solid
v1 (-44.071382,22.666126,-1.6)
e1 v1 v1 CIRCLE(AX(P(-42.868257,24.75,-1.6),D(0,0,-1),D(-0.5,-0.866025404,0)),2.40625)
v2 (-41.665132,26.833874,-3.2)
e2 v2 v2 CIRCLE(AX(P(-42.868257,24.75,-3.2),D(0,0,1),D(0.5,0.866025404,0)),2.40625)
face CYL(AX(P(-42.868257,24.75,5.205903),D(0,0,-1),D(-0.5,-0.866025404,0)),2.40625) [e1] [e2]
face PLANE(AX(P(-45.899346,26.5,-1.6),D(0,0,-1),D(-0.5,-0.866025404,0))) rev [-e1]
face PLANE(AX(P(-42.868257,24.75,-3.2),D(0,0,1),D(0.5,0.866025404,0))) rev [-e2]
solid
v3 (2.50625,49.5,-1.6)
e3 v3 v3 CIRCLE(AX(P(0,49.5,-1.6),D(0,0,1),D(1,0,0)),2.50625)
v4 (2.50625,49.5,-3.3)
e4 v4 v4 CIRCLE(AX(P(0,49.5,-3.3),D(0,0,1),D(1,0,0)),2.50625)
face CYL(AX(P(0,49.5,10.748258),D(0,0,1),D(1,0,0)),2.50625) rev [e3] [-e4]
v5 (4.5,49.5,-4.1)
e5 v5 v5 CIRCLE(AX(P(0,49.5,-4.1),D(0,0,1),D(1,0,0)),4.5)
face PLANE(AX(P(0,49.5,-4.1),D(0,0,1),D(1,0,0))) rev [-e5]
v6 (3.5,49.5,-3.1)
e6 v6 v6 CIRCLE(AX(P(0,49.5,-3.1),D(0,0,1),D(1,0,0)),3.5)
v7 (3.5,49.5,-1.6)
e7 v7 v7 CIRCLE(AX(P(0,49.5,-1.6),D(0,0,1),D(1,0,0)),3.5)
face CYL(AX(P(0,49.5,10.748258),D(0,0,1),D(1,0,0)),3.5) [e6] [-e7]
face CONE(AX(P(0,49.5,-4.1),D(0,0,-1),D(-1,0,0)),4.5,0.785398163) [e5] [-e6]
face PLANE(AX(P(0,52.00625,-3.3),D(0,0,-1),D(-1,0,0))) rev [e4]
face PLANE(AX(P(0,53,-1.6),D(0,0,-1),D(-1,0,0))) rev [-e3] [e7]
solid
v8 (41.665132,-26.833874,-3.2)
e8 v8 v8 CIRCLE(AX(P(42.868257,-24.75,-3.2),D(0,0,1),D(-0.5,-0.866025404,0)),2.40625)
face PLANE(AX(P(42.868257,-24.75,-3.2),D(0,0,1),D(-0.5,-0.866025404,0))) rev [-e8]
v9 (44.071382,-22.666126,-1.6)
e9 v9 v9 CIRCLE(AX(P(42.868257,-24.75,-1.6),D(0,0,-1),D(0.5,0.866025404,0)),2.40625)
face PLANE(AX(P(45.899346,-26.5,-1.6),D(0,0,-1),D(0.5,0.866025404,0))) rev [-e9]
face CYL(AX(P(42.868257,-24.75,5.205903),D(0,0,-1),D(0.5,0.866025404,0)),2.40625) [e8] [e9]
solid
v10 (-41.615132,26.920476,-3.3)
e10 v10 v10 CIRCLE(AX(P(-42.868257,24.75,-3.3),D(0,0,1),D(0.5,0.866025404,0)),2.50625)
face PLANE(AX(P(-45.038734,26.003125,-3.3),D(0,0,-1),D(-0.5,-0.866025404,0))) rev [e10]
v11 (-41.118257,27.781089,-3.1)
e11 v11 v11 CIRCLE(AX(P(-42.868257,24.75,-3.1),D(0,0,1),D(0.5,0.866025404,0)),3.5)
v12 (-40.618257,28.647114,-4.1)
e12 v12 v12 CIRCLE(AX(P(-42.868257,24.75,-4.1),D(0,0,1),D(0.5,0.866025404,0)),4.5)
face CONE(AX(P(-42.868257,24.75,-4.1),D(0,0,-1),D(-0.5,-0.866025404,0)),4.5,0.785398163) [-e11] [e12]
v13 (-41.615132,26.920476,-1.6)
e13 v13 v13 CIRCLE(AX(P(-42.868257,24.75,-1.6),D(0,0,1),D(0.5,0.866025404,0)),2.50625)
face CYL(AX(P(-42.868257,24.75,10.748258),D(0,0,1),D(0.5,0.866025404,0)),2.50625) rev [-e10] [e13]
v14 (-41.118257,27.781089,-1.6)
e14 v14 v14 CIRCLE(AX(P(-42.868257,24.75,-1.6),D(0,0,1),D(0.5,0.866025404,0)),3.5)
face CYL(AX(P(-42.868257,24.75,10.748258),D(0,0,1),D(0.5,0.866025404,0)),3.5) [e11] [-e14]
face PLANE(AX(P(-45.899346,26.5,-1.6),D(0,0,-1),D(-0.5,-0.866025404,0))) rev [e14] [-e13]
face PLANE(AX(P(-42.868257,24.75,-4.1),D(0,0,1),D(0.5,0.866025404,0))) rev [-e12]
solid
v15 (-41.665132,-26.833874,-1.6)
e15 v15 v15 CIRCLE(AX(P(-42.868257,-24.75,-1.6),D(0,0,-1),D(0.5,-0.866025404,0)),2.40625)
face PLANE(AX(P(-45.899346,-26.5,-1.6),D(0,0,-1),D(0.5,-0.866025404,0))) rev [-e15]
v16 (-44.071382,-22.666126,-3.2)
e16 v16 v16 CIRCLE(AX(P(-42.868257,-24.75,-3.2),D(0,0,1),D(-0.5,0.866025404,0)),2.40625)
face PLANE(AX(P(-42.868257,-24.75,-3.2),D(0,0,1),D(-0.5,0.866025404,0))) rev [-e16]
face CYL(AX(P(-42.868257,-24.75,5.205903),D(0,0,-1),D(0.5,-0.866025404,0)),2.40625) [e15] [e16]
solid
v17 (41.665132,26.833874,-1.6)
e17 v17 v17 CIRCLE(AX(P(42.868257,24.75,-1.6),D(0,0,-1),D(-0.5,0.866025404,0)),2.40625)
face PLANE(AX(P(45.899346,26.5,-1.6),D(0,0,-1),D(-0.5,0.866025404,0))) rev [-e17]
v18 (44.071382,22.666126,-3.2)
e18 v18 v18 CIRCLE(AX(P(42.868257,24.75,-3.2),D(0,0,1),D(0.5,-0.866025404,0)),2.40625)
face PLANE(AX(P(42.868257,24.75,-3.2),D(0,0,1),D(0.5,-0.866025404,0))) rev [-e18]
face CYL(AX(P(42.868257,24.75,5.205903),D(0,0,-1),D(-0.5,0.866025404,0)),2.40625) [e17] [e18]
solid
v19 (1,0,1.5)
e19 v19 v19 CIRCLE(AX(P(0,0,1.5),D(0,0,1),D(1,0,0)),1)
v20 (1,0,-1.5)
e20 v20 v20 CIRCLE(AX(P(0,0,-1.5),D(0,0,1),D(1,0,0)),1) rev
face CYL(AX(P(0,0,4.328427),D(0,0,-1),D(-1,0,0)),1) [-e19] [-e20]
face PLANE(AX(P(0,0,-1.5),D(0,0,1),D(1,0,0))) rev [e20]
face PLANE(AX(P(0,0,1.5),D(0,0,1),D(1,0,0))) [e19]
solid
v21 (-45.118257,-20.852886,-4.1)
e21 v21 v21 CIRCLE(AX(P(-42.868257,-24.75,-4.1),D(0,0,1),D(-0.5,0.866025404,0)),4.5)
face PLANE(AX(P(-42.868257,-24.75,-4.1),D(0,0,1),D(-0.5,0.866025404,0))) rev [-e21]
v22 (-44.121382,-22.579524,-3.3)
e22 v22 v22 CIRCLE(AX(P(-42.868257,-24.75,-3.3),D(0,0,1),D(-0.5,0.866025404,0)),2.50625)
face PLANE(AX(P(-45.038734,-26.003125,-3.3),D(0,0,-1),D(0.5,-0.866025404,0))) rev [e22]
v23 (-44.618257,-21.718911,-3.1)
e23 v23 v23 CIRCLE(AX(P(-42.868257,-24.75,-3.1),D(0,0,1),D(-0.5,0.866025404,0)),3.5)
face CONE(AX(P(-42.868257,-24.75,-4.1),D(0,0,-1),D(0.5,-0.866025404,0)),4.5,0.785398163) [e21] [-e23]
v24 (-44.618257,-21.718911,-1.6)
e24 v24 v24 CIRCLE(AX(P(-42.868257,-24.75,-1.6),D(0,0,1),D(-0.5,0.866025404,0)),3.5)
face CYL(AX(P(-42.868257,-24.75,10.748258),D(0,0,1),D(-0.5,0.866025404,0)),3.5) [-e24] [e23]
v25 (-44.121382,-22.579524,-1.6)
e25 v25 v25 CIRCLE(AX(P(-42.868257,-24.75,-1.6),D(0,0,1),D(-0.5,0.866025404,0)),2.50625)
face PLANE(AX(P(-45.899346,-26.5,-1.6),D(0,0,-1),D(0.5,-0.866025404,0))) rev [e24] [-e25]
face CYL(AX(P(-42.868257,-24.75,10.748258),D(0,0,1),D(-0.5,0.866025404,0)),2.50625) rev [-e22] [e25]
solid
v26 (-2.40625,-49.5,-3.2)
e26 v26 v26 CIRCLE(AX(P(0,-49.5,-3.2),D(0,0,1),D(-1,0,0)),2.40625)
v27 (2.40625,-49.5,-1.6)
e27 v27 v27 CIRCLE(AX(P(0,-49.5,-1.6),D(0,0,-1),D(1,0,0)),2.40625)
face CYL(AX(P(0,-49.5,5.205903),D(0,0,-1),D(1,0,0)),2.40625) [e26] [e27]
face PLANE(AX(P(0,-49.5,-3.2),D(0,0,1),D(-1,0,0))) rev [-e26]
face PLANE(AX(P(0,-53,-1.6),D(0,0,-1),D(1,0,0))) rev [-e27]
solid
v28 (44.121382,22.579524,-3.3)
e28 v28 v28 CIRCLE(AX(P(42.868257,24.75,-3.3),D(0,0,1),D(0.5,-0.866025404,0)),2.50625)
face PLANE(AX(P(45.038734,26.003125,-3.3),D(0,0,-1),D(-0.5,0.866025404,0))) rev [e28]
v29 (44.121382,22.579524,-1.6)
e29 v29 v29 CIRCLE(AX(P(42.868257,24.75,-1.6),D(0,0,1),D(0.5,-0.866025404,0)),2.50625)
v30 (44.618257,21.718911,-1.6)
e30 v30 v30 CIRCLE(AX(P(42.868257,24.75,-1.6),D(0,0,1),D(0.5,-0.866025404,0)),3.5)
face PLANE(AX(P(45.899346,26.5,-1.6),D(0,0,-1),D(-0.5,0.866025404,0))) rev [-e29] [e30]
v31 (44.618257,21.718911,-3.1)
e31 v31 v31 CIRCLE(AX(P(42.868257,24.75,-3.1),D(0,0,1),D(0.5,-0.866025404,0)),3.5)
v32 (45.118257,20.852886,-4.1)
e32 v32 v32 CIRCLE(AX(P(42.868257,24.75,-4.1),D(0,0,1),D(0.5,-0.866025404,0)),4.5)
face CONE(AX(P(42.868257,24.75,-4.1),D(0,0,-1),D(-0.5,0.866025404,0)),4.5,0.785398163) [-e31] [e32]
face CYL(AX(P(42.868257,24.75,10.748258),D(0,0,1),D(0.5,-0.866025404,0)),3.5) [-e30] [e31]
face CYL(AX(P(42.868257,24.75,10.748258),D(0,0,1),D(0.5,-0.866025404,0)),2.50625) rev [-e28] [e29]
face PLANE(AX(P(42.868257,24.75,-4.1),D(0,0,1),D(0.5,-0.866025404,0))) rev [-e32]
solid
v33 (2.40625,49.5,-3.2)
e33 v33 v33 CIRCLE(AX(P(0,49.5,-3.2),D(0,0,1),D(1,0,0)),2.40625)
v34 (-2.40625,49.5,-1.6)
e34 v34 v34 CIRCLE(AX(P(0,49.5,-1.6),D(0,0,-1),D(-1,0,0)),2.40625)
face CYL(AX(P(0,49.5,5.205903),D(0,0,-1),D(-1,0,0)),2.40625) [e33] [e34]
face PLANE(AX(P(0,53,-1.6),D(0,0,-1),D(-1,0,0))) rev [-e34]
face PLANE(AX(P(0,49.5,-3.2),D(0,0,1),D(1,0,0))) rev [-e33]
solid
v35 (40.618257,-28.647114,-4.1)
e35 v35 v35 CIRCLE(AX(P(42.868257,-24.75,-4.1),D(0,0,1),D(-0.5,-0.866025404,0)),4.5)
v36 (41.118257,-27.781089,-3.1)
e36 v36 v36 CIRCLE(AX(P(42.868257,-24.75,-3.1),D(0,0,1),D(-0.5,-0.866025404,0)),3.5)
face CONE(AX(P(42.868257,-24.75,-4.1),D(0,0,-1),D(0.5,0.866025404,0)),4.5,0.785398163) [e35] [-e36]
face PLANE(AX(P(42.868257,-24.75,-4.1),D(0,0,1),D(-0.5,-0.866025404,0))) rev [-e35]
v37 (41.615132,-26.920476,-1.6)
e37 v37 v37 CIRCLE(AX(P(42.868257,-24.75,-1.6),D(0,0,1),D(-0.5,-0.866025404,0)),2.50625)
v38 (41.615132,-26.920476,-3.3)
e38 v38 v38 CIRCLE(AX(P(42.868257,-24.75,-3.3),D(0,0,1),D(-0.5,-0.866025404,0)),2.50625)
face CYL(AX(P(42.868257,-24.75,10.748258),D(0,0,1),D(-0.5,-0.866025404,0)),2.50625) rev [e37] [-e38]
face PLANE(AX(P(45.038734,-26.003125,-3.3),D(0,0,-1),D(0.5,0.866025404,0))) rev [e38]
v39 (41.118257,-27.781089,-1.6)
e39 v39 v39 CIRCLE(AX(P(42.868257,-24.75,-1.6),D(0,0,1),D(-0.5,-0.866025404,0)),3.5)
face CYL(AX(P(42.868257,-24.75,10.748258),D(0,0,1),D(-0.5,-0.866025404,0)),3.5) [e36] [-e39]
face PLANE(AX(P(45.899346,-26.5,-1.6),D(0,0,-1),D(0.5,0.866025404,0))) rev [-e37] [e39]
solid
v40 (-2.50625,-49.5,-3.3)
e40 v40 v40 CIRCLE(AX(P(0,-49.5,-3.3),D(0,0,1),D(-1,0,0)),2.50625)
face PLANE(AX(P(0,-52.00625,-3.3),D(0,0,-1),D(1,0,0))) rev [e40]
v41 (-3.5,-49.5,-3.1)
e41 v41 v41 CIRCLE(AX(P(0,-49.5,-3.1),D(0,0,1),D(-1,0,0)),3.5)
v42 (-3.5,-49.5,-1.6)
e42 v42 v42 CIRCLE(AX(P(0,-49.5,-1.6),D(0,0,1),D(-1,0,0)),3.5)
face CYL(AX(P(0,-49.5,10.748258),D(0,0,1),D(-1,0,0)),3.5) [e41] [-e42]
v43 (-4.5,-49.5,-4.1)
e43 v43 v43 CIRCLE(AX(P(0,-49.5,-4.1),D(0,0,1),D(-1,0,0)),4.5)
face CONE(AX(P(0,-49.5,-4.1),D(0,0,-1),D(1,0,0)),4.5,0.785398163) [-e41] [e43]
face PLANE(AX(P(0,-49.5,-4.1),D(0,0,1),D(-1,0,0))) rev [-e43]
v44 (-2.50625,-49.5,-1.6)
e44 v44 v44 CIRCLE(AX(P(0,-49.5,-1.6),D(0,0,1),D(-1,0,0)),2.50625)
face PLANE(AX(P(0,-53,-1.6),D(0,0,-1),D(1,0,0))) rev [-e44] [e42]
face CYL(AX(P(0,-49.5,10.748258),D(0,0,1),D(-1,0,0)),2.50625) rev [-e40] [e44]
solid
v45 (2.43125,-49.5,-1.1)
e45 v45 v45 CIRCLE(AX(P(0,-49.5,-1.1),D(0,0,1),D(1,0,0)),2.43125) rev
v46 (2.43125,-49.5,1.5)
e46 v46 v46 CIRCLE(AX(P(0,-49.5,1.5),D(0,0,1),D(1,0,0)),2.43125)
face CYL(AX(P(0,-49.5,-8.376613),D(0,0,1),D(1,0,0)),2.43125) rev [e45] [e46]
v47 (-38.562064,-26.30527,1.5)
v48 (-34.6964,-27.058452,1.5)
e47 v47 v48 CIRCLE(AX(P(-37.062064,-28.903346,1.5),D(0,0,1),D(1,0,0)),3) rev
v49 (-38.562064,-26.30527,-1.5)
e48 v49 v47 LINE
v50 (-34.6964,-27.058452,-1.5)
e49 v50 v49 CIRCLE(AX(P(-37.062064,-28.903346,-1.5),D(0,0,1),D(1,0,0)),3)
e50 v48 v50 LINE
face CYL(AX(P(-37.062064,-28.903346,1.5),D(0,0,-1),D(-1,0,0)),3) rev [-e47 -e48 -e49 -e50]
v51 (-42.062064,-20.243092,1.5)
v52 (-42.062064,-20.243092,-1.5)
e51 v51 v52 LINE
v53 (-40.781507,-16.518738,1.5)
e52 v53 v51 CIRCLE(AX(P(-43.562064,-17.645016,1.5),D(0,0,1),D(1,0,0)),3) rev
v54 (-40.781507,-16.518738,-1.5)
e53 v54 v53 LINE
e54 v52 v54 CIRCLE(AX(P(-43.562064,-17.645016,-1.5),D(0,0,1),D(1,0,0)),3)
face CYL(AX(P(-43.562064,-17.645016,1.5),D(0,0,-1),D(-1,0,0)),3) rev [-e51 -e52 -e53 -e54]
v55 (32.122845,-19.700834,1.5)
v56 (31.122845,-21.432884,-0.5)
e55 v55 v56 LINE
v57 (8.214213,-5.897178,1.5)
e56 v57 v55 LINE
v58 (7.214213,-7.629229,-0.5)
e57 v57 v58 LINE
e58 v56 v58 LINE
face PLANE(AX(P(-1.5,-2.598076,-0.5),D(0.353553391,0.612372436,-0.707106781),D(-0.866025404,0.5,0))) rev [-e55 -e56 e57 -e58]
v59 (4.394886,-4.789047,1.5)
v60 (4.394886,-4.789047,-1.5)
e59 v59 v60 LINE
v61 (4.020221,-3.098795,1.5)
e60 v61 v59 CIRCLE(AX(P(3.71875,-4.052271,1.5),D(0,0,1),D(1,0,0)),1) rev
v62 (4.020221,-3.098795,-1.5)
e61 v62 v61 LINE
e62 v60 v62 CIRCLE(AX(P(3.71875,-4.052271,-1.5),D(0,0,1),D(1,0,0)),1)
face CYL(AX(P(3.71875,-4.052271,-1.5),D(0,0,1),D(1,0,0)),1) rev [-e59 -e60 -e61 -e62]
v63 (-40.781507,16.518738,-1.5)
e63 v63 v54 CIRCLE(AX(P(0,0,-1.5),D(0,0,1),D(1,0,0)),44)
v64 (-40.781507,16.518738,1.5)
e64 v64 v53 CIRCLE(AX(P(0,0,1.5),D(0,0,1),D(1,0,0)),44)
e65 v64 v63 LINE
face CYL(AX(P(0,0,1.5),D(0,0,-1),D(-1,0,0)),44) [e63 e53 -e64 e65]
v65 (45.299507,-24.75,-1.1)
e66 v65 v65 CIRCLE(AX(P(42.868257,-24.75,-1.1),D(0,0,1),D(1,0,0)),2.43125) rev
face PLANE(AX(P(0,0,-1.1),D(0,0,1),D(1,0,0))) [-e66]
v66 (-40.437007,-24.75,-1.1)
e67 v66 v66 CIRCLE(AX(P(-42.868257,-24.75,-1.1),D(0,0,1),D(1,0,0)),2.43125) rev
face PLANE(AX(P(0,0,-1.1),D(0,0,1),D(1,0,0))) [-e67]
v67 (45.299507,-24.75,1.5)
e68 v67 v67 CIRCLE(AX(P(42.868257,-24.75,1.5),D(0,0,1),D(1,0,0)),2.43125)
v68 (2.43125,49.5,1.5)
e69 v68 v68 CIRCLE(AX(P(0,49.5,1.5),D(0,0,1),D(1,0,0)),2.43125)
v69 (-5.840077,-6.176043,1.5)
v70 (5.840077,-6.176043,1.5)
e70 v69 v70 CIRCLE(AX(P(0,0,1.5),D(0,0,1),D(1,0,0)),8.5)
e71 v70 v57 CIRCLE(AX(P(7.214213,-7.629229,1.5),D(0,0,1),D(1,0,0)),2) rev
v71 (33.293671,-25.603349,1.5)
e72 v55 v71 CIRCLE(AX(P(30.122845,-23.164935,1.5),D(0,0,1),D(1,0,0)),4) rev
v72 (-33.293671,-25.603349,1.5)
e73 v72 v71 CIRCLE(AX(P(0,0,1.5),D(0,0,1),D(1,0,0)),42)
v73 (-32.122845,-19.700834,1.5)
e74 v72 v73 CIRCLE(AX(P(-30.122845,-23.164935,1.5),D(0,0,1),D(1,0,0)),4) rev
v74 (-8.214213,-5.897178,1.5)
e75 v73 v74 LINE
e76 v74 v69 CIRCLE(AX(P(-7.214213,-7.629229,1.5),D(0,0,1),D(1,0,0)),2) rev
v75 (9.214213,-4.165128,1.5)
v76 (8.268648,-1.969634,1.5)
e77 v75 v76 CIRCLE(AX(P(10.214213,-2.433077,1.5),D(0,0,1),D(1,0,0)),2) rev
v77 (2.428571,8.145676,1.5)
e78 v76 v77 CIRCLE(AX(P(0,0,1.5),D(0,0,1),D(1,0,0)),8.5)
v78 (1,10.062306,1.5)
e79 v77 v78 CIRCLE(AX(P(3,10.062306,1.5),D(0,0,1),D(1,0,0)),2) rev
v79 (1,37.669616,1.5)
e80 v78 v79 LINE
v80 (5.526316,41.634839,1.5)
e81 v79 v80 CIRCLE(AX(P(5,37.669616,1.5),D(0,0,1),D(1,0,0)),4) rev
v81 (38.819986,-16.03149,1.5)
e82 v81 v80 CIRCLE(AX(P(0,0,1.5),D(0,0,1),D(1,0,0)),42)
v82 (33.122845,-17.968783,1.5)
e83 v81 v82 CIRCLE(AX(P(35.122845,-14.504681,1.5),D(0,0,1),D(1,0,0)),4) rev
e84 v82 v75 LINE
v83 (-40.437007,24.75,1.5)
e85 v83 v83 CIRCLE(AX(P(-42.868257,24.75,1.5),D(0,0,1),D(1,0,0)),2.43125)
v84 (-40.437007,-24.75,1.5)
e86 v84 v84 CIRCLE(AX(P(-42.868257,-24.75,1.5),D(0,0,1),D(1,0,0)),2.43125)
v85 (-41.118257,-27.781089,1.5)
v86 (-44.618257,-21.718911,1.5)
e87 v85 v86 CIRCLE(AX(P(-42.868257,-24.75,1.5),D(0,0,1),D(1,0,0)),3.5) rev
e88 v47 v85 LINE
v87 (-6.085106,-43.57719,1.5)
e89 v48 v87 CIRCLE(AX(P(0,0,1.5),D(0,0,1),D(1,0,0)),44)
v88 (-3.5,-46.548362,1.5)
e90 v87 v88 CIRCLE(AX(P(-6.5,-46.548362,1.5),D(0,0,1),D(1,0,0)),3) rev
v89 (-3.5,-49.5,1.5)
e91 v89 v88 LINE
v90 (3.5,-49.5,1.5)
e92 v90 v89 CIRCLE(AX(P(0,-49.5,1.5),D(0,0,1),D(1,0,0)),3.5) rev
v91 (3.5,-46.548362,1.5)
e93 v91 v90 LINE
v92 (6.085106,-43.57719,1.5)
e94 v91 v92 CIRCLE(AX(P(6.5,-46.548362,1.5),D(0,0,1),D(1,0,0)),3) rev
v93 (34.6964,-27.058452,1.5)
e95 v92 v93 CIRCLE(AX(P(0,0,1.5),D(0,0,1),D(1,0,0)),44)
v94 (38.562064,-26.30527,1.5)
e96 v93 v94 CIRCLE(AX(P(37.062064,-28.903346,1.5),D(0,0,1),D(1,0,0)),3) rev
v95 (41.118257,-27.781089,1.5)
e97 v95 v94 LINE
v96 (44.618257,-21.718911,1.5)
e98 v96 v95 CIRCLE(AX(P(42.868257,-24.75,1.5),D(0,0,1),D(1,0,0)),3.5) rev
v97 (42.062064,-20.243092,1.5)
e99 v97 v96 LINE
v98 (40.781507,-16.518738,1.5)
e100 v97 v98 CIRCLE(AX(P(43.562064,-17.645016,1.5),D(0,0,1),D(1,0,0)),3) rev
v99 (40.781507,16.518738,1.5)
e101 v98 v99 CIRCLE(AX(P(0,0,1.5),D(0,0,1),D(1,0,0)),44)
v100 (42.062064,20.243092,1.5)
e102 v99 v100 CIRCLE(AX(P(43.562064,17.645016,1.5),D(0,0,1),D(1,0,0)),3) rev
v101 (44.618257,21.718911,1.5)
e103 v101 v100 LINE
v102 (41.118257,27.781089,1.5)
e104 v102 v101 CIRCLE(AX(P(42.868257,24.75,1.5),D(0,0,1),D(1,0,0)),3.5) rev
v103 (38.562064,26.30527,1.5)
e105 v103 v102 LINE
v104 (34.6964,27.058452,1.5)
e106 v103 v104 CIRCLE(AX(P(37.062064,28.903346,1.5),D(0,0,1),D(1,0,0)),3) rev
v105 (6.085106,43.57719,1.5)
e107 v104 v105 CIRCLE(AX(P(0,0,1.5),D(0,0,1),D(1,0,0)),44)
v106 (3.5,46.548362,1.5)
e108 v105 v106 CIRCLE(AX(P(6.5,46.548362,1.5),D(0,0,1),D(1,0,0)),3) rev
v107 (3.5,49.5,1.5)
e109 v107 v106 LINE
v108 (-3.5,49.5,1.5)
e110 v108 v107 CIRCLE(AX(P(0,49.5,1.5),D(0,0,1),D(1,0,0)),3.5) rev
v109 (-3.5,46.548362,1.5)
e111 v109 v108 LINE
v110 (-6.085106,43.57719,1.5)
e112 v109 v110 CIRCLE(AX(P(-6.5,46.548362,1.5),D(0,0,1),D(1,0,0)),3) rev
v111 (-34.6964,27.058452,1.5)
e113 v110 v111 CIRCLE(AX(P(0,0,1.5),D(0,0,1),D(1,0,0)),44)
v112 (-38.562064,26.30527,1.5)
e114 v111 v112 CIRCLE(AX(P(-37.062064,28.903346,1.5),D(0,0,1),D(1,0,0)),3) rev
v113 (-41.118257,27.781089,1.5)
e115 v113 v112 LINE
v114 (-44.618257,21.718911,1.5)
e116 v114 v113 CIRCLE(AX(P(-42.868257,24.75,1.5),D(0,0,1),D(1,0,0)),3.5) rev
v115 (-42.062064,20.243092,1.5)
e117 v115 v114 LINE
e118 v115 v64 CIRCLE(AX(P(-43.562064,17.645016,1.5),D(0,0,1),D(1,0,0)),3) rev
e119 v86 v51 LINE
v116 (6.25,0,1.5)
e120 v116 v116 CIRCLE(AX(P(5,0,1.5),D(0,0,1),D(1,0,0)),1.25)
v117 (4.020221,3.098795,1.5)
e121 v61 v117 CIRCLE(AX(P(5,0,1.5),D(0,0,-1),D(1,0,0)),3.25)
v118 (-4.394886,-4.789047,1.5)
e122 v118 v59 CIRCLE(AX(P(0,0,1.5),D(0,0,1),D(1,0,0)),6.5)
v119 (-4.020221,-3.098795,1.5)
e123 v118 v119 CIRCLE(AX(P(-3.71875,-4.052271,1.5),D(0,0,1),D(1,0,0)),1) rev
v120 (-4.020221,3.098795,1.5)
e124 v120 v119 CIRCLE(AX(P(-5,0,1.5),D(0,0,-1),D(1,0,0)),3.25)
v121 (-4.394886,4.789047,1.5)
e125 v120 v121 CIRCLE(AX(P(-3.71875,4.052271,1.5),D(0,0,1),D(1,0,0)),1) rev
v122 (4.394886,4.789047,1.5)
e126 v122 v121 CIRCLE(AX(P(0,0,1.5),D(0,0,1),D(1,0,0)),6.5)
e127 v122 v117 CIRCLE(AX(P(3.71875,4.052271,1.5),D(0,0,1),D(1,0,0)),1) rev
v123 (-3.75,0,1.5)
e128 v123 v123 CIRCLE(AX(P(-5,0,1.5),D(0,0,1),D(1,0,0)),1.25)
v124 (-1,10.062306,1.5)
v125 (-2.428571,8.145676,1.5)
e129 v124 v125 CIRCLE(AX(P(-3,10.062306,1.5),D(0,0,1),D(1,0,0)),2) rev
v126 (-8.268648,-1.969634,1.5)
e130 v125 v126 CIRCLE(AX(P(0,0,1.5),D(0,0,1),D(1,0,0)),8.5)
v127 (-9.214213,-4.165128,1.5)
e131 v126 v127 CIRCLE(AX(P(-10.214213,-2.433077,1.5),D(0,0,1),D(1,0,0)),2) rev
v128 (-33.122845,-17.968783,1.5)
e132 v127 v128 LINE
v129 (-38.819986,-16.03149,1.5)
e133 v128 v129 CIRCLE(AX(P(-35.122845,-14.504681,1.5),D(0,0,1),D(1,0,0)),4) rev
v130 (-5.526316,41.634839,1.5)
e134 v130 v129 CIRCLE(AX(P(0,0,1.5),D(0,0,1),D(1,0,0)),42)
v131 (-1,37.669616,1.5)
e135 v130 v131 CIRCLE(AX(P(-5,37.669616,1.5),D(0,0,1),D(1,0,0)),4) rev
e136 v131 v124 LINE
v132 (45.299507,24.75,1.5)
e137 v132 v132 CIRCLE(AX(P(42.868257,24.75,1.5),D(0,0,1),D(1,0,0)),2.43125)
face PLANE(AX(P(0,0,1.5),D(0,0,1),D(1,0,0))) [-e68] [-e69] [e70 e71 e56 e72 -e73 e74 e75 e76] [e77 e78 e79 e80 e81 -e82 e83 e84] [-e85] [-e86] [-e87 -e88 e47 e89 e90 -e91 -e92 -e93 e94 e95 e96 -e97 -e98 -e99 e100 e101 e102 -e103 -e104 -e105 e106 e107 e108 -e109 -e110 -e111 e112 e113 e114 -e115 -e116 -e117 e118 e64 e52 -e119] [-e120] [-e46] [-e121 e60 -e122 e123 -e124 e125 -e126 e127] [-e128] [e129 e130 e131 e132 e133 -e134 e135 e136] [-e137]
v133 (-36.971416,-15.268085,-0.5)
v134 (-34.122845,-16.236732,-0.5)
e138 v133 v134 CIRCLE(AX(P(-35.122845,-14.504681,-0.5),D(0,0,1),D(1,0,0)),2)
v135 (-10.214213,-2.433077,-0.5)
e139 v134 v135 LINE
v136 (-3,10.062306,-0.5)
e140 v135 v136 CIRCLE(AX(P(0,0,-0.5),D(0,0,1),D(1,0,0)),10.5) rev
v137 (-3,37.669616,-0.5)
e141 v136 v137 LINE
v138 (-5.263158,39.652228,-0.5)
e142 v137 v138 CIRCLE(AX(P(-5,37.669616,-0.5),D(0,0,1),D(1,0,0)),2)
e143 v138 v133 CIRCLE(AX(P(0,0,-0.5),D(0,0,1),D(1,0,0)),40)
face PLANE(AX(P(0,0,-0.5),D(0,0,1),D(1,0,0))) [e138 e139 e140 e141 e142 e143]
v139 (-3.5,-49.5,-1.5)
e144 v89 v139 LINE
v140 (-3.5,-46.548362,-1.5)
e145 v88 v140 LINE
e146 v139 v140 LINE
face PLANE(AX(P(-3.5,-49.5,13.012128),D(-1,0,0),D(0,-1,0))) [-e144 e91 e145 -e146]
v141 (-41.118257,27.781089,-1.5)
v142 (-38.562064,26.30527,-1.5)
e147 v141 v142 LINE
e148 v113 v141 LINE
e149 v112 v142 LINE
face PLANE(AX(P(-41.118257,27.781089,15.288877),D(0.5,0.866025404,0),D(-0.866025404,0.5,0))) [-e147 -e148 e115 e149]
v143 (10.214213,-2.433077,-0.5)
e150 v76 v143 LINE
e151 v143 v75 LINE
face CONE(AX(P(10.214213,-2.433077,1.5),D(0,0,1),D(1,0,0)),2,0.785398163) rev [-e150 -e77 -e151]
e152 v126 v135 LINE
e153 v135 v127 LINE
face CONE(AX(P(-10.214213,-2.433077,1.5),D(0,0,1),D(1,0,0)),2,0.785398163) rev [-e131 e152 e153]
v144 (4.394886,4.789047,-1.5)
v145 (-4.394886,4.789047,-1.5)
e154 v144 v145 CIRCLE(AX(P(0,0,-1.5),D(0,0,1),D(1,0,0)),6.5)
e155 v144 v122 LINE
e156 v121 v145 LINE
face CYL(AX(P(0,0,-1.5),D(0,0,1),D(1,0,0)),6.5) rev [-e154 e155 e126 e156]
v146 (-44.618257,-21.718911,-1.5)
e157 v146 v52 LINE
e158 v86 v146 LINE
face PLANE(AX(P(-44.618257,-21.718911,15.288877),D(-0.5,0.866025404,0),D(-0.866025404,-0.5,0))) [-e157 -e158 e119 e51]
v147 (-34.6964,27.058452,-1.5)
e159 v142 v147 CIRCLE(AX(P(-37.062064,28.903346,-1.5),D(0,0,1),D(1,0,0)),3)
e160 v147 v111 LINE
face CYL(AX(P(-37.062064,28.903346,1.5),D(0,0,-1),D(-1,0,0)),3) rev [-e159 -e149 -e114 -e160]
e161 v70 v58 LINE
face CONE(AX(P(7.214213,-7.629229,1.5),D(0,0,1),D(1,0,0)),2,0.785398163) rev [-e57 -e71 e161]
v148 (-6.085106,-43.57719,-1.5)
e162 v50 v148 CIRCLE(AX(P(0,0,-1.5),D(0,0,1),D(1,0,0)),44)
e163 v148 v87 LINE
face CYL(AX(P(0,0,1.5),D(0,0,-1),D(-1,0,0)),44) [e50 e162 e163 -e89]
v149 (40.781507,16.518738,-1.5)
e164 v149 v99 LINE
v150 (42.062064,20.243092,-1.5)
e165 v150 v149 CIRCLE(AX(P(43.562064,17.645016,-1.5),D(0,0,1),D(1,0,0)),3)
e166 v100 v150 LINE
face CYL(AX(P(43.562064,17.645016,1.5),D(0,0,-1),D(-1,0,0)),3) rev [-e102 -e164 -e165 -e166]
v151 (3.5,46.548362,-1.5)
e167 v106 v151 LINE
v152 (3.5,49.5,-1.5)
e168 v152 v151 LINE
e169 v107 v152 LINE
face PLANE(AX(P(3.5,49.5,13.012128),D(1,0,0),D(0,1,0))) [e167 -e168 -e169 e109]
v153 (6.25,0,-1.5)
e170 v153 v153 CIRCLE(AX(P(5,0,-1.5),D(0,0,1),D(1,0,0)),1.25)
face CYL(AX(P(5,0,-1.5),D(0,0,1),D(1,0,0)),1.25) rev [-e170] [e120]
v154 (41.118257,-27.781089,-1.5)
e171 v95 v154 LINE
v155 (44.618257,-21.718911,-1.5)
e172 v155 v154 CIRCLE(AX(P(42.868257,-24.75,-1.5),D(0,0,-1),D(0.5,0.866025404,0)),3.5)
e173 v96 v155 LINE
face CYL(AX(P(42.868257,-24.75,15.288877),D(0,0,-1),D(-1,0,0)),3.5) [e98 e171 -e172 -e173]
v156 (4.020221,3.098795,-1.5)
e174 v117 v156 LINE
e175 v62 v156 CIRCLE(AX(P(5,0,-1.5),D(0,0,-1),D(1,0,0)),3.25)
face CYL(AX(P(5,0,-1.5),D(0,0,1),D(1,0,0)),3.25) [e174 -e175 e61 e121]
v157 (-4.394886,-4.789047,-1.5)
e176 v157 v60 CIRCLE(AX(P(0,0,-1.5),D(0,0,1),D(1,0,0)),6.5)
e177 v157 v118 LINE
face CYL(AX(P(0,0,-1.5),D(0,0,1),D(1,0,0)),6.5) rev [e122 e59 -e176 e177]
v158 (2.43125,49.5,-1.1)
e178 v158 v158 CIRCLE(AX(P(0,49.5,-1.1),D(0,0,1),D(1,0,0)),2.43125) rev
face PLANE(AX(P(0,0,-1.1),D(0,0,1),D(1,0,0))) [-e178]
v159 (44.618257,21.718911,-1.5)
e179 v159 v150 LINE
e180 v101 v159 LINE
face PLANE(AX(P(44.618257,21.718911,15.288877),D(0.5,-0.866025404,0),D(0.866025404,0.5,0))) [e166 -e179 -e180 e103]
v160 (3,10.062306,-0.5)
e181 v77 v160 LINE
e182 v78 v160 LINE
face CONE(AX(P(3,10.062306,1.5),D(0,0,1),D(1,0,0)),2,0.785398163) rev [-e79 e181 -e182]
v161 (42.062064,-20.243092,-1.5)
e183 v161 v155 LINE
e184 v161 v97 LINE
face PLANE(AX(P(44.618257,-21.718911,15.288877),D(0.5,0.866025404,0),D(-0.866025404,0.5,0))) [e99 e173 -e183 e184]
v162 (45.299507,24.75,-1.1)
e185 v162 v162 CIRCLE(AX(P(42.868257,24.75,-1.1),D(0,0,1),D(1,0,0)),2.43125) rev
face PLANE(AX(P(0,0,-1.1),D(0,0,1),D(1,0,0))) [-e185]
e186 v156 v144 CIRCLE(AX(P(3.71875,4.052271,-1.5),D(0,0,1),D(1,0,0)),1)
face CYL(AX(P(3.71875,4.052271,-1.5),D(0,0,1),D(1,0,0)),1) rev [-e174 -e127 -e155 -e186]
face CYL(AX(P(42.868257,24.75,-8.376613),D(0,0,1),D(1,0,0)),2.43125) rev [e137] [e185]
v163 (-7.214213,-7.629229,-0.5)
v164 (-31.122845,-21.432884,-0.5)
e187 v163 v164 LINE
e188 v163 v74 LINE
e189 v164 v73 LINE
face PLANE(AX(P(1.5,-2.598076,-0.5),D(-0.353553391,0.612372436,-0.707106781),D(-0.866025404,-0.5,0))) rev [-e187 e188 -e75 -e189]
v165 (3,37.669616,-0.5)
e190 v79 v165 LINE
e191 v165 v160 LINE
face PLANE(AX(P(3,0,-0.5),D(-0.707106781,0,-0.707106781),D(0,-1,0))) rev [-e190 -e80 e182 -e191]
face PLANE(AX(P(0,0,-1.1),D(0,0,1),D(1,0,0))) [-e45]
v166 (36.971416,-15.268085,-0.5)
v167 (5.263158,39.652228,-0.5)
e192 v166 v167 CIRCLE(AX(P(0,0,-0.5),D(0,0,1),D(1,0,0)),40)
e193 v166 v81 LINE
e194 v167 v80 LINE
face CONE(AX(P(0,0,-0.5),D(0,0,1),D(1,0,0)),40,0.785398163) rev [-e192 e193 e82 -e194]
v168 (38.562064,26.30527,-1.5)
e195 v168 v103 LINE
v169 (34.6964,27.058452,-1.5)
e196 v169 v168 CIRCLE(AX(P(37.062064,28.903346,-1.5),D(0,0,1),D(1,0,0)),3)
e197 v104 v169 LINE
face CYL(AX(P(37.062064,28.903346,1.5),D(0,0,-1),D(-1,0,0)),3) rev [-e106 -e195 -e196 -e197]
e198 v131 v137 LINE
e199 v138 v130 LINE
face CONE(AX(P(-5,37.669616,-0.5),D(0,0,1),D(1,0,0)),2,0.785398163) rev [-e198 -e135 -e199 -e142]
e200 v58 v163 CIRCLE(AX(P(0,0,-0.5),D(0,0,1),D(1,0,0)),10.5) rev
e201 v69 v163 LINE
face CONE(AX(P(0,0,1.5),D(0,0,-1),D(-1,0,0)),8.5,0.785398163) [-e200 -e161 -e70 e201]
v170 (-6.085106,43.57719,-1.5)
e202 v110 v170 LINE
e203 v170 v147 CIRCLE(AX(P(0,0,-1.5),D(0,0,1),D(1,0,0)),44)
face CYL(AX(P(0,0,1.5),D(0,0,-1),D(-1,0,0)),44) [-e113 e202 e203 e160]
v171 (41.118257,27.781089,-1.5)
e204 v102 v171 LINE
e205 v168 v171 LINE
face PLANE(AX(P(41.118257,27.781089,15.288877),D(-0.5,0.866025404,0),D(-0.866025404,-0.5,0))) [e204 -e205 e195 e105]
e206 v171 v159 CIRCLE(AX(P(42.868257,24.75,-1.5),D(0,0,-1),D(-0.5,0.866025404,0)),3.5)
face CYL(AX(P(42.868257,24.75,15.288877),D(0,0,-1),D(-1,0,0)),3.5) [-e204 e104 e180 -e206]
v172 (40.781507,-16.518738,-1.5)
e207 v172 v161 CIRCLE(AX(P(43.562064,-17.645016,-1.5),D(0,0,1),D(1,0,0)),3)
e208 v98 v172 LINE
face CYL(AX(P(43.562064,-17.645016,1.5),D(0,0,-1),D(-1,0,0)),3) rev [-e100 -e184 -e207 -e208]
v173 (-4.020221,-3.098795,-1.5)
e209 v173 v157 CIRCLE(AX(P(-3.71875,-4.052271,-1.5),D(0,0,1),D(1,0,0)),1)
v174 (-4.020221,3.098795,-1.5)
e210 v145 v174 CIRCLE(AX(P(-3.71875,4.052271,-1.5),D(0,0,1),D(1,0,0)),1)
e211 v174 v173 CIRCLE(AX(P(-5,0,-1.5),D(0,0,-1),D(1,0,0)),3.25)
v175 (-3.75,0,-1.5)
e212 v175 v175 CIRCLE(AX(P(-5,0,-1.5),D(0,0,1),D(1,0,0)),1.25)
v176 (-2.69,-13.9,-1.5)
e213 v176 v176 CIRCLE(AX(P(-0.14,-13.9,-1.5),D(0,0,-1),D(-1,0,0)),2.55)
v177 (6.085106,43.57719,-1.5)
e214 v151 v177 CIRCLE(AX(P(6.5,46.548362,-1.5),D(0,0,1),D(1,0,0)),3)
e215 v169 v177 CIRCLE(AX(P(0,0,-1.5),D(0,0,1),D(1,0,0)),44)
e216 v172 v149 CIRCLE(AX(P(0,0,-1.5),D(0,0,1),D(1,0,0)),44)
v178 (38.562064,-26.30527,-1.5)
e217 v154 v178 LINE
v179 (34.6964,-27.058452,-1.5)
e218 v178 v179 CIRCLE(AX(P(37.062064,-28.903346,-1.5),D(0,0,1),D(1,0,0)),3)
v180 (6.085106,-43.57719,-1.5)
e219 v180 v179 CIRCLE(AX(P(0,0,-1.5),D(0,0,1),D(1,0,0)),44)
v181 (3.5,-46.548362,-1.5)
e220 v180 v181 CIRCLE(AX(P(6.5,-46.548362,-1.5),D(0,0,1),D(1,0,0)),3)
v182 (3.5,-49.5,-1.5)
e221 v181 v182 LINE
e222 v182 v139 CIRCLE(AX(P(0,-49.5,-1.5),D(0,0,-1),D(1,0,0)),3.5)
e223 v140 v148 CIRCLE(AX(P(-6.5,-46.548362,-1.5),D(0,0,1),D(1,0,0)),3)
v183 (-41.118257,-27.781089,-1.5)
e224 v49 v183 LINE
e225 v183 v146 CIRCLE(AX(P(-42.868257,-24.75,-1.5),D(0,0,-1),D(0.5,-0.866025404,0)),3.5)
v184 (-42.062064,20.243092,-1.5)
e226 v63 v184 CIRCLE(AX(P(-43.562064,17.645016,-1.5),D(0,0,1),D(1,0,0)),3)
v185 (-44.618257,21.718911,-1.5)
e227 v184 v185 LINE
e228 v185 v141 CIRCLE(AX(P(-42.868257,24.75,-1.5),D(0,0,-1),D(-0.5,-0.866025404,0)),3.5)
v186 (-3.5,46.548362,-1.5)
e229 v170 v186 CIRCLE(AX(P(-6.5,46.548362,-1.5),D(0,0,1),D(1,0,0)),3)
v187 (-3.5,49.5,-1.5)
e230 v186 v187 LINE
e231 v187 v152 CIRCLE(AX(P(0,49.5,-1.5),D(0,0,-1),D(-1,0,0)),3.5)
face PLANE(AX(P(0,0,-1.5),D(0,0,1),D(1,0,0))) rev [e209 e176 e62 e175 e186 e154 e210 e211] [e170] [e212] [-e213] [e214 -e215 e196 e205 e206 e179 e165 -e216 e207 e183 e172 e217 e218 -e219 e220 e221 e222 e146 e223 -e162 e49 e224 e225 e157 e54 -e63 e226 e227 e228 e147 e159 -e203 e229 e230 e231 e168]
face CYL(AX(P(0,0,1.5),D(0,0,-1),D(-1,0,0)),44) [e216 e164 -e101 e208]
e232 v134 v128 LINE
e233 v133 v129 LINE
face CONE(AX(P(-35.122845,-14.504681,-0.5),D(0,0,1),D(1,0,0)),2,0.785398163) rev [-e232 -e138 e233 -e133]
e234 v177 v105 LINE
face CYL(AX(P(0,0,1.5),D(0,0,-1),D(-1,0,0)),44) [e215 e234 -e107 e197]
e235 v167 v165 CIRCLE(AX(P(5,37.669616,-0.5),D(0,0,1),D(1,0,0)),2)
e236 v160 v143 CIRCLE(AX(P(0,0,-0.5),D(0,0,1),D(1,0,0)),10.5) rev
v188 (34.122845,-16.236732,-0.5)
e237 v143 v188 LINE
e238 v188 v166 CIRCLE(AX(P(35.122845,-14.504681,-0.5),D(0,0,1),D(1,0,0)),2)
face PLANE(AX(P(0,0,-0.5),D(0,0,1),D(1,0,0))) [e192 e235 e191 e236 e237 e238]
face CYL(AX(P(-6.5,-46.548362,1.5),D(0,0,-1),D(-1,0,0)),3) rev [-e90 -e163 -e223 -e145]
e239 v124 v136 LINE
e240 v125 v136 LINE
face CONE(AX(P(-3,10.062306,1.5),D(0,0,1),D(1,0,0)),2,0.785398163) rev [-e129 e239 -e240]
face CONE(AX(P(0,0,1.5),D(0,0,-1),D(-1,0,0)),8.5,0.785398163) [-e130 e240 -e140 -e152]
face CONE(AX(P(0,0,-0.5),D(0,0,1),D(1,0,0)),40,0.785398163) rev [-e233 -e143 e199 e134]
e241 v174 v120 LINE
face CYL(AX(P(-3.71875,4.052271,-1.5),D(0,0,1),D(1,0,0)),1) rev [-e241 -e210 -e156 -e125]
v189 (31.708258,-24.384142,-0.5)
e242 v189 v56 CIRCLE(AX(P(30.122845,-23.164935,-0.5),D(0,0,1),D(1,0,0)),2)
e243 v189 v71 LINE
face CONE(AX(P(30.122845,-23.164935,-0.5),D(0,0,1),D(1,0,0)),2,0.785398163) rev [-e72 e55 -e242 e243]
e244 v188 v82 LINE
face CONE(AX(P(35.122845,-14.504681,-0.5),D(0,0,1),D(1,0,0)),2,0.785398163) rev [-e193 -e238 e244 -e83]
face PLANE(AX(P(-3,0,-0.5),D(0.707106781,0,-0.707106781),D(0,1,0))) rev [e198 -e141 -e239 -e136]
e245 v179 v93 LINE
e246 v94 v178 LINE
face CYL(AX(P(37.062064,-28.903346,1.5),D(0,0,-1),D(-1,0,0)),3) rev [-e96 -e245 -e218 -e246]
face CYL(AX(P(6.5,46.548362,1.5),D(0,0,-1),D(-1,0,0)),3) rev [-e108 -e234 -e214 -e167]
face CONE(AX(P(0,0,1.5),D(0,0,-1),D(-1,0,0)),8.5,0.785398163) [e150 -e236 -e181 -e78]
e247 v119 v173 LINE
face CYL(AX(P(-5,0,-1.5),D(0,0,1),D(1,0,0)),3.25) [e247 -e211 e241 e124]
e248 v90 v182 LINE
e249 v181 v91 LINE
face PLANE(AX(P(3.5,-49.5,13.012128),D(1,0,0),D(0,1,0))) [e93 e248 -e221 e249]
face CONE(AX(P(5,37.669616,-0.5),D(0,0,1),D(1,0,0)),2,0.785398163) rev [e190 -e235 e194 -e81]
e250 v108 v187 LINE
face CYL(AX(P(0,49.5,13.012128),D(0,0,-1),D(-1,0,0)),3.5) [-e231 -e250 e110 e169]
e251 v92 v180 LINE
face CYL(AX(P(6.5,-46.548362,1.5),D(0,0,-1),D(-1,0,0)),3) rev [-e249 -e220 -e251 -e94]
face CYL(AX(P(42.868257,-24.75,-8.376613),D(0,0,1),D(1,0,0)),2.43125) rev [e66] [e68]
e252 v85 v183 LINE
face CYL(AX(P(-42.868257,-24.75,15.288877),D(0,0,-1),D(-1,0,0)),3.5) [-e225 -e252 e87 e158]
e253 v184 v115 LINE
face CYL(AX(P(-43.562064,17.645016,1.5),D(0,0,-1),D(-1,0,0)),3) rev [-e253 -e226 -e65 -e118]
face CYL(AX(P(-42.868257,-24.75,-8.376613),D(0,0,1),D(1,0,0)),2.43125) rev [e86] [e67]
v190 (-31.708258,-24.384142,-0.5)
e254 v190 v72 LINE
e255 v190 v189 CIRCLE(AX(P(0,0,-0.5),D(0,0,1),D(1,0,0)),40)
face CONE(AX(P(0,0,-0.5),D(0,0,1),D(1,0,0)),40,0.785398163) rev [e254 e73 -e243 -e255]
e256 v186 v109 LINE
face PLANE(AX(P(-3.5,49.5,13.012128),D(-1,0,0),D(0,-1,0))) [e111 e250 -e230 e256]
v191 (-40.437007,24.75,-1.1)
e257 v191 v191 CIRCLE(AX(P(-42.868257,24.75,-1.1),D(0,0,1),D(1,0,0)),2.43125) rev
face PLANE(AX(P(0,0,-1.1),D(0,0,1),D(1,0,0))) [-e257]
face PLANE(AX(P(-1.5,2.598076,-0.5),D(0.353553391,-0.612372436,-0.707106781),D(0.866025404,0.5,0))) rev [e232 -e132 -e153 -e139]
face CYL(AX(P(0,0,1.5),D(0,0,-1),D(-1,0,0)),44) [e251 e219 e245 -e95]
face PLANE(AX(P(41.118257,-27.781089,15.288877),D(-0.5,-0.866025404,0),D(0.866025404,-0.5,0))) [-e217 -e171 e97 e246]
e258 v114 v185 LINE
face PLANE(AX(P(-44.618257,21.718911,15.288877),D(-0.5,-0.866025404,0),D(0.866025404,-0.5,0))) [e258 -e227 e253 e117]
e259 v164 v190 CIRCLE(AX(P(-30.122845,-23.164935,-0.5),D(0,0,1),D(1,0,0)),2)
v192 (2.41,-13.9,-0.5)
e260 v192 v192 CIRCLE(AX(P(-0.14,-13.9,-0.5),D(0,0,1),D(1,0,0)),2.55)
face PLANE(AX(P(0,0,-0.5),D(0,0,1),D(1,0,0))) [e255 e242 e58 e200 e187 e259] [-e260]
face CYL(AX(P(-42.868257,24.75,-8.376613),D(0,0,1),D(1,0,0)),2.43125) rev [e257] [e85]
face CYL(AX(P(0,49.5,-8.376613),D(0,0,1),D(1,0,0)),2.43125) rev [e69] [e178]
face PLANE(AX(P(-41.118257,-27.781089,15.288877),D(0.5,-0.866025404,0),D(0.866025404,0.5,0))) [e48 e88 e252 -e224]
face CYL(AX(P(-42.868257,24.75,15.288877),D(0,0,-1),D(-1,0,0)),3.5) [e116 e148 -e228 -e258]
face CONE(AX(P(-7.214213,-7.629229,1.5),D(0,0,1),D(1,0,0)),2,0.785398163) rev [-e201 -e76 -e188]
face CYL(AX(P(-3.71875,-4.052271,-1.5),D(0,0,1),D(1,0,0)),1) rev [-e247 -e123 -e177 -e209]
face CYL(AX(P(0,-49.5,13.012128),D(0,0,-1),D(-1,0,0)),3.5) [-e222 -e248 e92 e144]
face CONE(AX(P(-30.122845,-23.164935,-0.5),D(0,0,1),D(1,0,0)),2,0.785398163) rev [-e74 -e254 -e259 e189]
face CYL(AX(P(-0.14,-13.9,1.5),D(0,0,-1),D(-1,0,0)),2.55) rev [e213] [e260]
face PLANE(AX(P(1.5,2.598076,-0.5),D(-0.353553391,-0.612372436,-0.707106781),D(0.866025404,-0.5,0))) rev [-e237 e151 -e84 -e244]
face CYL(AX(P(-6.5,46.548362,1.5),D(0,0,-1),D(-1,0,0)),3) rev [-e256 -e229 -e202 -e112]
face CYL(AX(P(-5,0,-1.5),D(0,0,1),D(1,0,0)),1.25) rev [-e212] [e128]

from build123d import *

# Parameters (mm, degrees)
SKETCH1_R                = 44
SKETCH1_R_2              = 42
BOSS_EXTRUDE1_DEPTH      = 1.5
SKETCH1_R_3              = 8.5
BOSS_EXTRUDE1_2_DEPTH    = 1.5
BOSS_EXTRUDE3_START      = -1.5
SKETCH1_3_R              = 42
SKETCH1_3_R_2            = 8.5
BOSS_EXTRUDE3_DEPTH      = 1
BOSS_EXTRUDE2_DEPTH      = 1.5
CIRPATTERN1_COUNT        = 3
CUT_EXTRUDE1_DEPTH       = 63.243473553
CUT_EXTRUDE1_DEPTH_BACK  = 63.243473553
SKETCH3_R                = 1.25
CUT_EXTRUDE2_DEPTH       = 63.243473553
CUT_EXTRUDE2_DEPTH_BACK  = 63.243473553
FILLET1_R                = 1
FILLET2_R                = 4
FILLET3_R                = 2
CHAMFER1_SIZE            = 2
SKETCH6_R                = 2.55
CUT_EXTRUDE3_DEPTH       = 63.297672655
BOSS_EXTRUDE4_START      = -3
BOSS_EXTRUDE4_DEPTH      = 3
FILLET4_R                = 3
CUT_EXTRUDE4_START       = -3
SKETCH9_R                = 2.43125
CUT_EXTRUDE4_DEPTH       = 2.6
CIRPATTERN2_COUNT        = 6
FILLET4_OF_CIRPATTERN2_R = 3
BOSS_EXTRUDE5_START      = 0.1
SKETCH11_R               = 2.40625
BOSS_EXTRUDE5_DEPTH      = 1.6
CIRPATTERN3_COUNT        = 6
BOSS_EXTRUDE6_START      = -1.5
SKETCH12_R               = 1
BOSS_EXTRUDE6_DEPTH      = 3


with BuildPart() as part:
    # Sketch1 → Boss-Extrude1 (new, symmetric)
    with BuildSketch(Plane.XY):
        Circle(SKETCH1_R)
        Circle(SKETCH1_R_2, mode=Mode.SUBTRACT)
    extrude(amount=BOSS_EXTRUDE1_DEPTH, both=True)



with BuildPart() as body_2:
    # Sketch1 → Boss-Extrude1 2 (new, symmetric)
    with BuildSketch(Plane.XY):
        Circle(SKETCH1_R_3)
    extrude(amount=BOSS_EXTRUDE1_2_DEPTH, both=True)


with BuildPart() as part_1:
    add(part.part)

    add(body_2.part)  # Boss-Extrude3 merges body 2
    # Sketch1<3> → Boss-Extrude3 (add)
    with BuildSketch(Plane.XY.offset(BOSS_EXTRUDE3_START)):
        Circle(SKETCH1_3_R)
        Circle(SKETCH1_3_R_2, mode=Mode.SUBTRACT)
    extrude(amount=BOSS_EXTRUDE3_DEPTH)

    # Sketch2 → Boss-Extrude2 (add, symmetric)
    with BuildSketch(Plane.XY):
        with BuildLine():
            Line((-1, 41.98809355), (-1, 0))
            Line((-1, 0), (1, 0))
            Line((1, 0), (1, 41.98809355))
            ThreePointArc((1, 41.98809355), (0, 42), (-1, 41.98809355))
        make_face()
    boss_extrude2 = extrude(amount=BOSS_EXTRUDE2_DEPTH, both=True)

    # CirPattern1: Boss-Extrude2 ×3 about axis
    cirpattern1_axis = Axis((0, 0, 0), (0, 0, 1))
    for i in range(1, CIRPATTERN1_COUNT):
        add(boss_extrude2.rotate(cirpattern1_axis, i * 360 / CIRPATTERN1_COUNT))

    # Sketch3 → Cut-Extrude1 (cut, two sides: drawn at the far end of the back side and taken through both)
    with BuildSketch(Plane.XY.offset(-CUT_EXTRUDE1_DEPTH_BACK)):
        with Locations((-5, 0)):
            Circle(SKETCH3_R)
        with Locations((5, 0)):
            Circle(SKETCH3_R)
    extrude(amount=CUT_EXTRUDE1_DEPTH + CUT_EXTRUDE1_DEPTH_BACK, mode=Mode.SUBTRACT)

    # Sketch5 → Cut-Extrude2 (cut, two sides: drawn at the far end of the back side and taken through both)
    with BuildSketch(Plane.XY.offset(-CUT_EXTRUDE2_DEPTH_BACK)):
        with BuildLine():
            ThreePointArc((-5.66875, -3.180451766), (-1.75, 0), (-5.66875, 3.180451766))
            ThreePointArc((-5.66875, 3.180451766), (0, 6.5), (5.66875, 3.180451766))
            ThreePointArc((5.66875, 3.180451766), (1.75, 0), (5.66875, -3.180451766))
            ThreePointArc((5.66875, -3.180451766), (0, -6.5), (-5.66875, -3.180451766))
        make_face()
    extrude(amount=CUT_EXTRUDE2_DEPTH + CUT_EXTRUDE2_DEPTH_BACK, mode=Mode.SUBTRACT)

    # Fillet1
    fillet1_edges = [part_1.edges().sort_by_distance(p)[0] for p in [
        (5.66875, 3.180451766, 0),
        (5.66875, -3.180451766, 0),
        (-5.66875, -3.180451766, 0),
        (-5.66875, 3.180451766, 0),
    ]]
    fillet(fillet1_edges, radius=FILLET1_R)

    # Fillet2
    fillet2_edges = [part_1.edges().sort_by_distance(p)[0] for p in [
        (1, 41.98809355, 0.5),
        (-1, 41.98809355, 0.5),
        (-35.862755671, -21.860072179, 0.5),
        (-36.862755671, -20.128021371, 0.5),
        (35.862755671, -21.860072179, 0.5),
        (36.862755671, -20.128021371, 0.5),
    ]]
    fillet(fillet2_edges, radius=FILLET2_R)

    # Fillet3
    fillet3_edges = [part_1.edges().sort_by_distance(p)[0] for p in [
        (-1, 8.440971508, 0.5),
        (1, 8.440971508, 0.5),
        (-6.810095759, -5.086511158, 0.5),
        (-7.810095759, -3.35446035, 0.5),
        (6.810095759, -5.086511158, 0.5),
        (7.810095759, -3.35446035, 0.5),
    ]]
    fillet(fillet3_edges, radius=FILLET3_R)

    # Chamfer1
    chamfer1_edges = [part_1.edges().sort_by_distance(p)[0] for p in [
        (34.046399663, -22.386657061, -0.5),
        (0, -42, -0.5),
        (-34.046399663, -22.386657061, -0.5),
        (-20.168528643, -12.799005979, -0.5),
        (-6.980897916, -5.642884706, -0.5),
        (0, -8.5, -0.5),
        (6.980897916, -5.642884706, -0.5),
        (20.168528643, -12.799005979, -0.5),
        (2.364213889, 40.678375546, -0.5),
        (36.373066959, 21, -0.5),
        (36.410613553, -18.291718485, -0.5),
        (21.168528643, -11.066955172, -0.5),
        (8.377330464, -3.224192583, -0.5),
        (7.361215932, 4.25, -0.5),
        (1.396432549, 8.867077289, -0.5),
        (1, 23.865961151, -0.5),
        (-8.377330464, -3.224192583, -0.5),
        (-21.168528643, -11.066955172, -0.5),
        (-36.410613553, -18.291718485, -0.5),
        (-36.373066959, 21, -0.5),
        (-2.364213889, 40.678375546, -0.5),
        (-1, 23.865961151, -0.5),
        (-1.396432549, 8.867077289, -0.5),
        (-7.361215932, 4.25, -0.5),
    ]]
    chamfer(chamfer1_edges, length=CHAMFER1_SIZE - 0.0001)  # a hair under: the kernel refuses the full size

    # Sketch6 → Cut-Extrude3 (cut, through all)
    with BuildSketch(Plane(origin=(0, 0, -1.5), x_dir=(-1, 0, 0), z_dir=(0, 0, -1))):
        with Locations((0.14, -13.9)):
            Circle(SKETCH6_R)
    extrude(amount=-CUT_EXTRUDE3_DEPTH, mode=Mode.SUBTRACT)

    # Sketch8 → Boss-Extrude4 (add)
    with BuildSketch(Plane(origin=(0, 0, -1.5), x_dir=(-1, 0, 0), z_dir=(0, 0, -1)).offset(BOSS_EXTRUDE4_START)):
        with BuildLine():
            Line((-3.5, 49.5), (-3.5, 43.860574552))
            ThreePointArc((-3.5, 43.860574552), (0, 44), (3.5, 43.860574552))
            Line((3.5, 43.860574552), (3.5, 49.5))
            ThreePointArc((3.5, 49.5), (0, 53), (-3.5, 49.5))
        make_face()
    boss_extrude4 = extrude(amount=BOSS_EXTRUDE4_DEPTH)

    # Fillet4
    fillet4_edges = [part_1.edges().sort_by_distance(p)[0] for p in [
        (3.5, 43.860574552, 0),
        (-3.5, 43.860574552, 0),
    ]]
    fillet(fillet4_edges, radius=FILLET4_R)

    # Sketch9 → Cut-Extrude4 (cut)
    with BuildSketch(Plane(origin=(0, 0, -1.5), x_dir=(-1, 0, 0), z_dir=(0, 0, -1)).offset(CUT_EXTRUDE4_START)):
        with Locations(Location((0, 49.5, 0), (0, 0, 180))):
            Circle(SKETCH9_R)
    cut_extrude4 = extrude(amount=CUT_EXTRUDE4_DEPTH, mode=Mode.SUBTRACT)

    # CirPattern2: Boss-Extrude4, Cut-Extrude4 ×6 about axis
    cirpattern2_axis = Axis((0, 0, 0), (0, 0, 1))
    add([boss_extrude4.rotate(cirpattern2_axis, i * 360 / CIRPATTERN2_COUNT) for i in range(1, CIRPATTERN2_COUNT)])
    add([cut_extrude4.rotate(cirpattern2_axis, i * 360 / CIRPATTERN2_COUNT) for i in range(1, CIRPATTERN2_COUNT)], mode=Mode.SUBTRACT)

    # Fillet4 of CirPattern2
    fillet4_of_cirpattern2_edges = [part_1.edges().sort_by_distance(p)[0] for p in [
        (-36.234371786, 24.961376189, 0),
        (-39.734371786, 18.899198363, 0),
        (-39.734371786, -18.899198363, 0),
        (-36.234371786, -24.961376189, 0),
        (-3.5, -43.860574552, 0),
        (3.5, -43.860574552, 0),
        (36.234371786, -24.961376189, 0),
        (39.734371786, -18.899198363, 0),
        (39.734371786, 18.899198363, 0),
        (36.234371786, 24.961376189, 0),
    ]]
    fillet(fillet4_of_cirpattern2_edges, radius=FILLET4_OF_CIRPATTERN2_R)


with BuildPart() as body_2_2:
    # Sketch10 → Revolve1 (revolve)
    with BuildSketch(Plane(origin=(0, 0, 0), x_dir=(0, 0, -1), z_dir=(1, 0, 0)), mode=Mode.PRIVATE) as revolve1_sk:
        Polygon((1.6, 53), (1.6, 52.00625), (3.3, 52.00625), (3.3, 49.5), (4.1, 49.5), (4.1, 54), (3.1, 53), align=None)
    revolve(revolve1_sk.sketch.rotate(Axis((0, 49.5, 10.748258215), (0, 0, -1)), 90), axis=Axis((0, 49.5, 10.748258215), (0, 0, -1)))


with BuildPart() as body_3:
    # Sketch11 → Boss-Extrude5 (new body)
    with BuildSketch(Plane.XY.offset(-3.3).offset(BOSS_EXTRUDE5_START)):
        with Locations(Location((0, 49.5, 0), (0, 0, 180))):
            Circle(SKETCH11_R)
    extrude(amount=BOSS_EXTRUDE5_DEPTH)


with BuildPart() as cirpattern3_1:
    # CirPattern3: pattern copy
    add(body_3.part.rotate(Axis((0, 0, 0), (0, 0, 1)), 1 * 360 / CIRPATTERN3_COUNT))


with BuildPart() as cirpattern3_2:
    # CirPattern3: pattern copy
    add(body_3.part.rotate(Axis((0, 0, 0), (0, 0, 1)), 2 * 360 / CIRPATTERN3_COUNT))


with BuildPart() as cirpattern3_3:
    # CirPattern3: pattern copy
    add(body_3.part.rotate(Axis((0, 0, 0), (0, 0, 1)), 3 * 360 / CIRPATTERN3_COUNT))


with BuildPart() as cirpattern3_4:
    # CirPattern3: pattern copy
    add(body_3.part.rotate(Axis((0, 0, 0), (0, 0, 1)), 4 * 360 / CIRPATTERN3_COUNT))


with BuildPart() as cirpattern3_5:
    # CirPattern3: pattern copy
    add(body_3.part.rotate(Axis((0, 0, 0), (0, 0, 1)), 5 * 360 / CIRPATTERN3_COUNT))


with BuildPart() as cirpattern3_6:
    # CirPattern3: pattern copy
    add(body_2_2.part.rotate(Axis((0, 0, 0), (0, 0, 1)), 1 * 360 / CIRPATTERN3_COUNT))


with BuildPart() as cirpattern3_7:
    # CirPattern3: pattern copy
    add(body_2_2.part.rotate(Axis((0, 0, 0), (0, 0, 1)), 2 * 360 / CIRPATTERN3_COUNT))


with BuildPart() as cirpattern3_8:
    # CirPattern3: pattern copy
    add(body_2_2.part.rotate(Axis((0, 0, 0), (0, 0, 1)), 3 * 360 / CIRPATTERN3_COUNT))


with BuildPart() as cirpattern3_9:
    # CirPattern3: pattern copy
    add(body_2_2.part.rotate(Axis((0, 0, 0), (0, 0, 1)), 4 * 360 / CIRPATTERN3_COUNT))


with BuildPart() as cirpattern3_10:
    # CirPattern3: pattern copy
    add(body_2_2.part.rotate(Axis((0, 0, 0), (0, 0, 1)), 5 * 360 / CIRPATTERN3_COUNT))


with BuildPart() as body_14:
    # Sketch12 → Boss-Extrude6 (new body)
    with BuildSketch(Plane.XY.offset(BOSS_EXTRUDE6_START)):
        Circle(SKETCH12_R)
    extrude(amount=BOSS_EXTRUDE6_DEPTH)


solid = Compound([part_1.part, body_2_2.part, body_3.part, cirpattern3_1.part, cirpattern3_2.part, cirpattern3_3.part, cirpattern3_4.part, cirpattern3_5.part, cirpattern3_6.part, cirpattern3_7.part, cirpattern3_8.part, cirpattern3_9.part, cirpattern3_10.part, body_14.part])
